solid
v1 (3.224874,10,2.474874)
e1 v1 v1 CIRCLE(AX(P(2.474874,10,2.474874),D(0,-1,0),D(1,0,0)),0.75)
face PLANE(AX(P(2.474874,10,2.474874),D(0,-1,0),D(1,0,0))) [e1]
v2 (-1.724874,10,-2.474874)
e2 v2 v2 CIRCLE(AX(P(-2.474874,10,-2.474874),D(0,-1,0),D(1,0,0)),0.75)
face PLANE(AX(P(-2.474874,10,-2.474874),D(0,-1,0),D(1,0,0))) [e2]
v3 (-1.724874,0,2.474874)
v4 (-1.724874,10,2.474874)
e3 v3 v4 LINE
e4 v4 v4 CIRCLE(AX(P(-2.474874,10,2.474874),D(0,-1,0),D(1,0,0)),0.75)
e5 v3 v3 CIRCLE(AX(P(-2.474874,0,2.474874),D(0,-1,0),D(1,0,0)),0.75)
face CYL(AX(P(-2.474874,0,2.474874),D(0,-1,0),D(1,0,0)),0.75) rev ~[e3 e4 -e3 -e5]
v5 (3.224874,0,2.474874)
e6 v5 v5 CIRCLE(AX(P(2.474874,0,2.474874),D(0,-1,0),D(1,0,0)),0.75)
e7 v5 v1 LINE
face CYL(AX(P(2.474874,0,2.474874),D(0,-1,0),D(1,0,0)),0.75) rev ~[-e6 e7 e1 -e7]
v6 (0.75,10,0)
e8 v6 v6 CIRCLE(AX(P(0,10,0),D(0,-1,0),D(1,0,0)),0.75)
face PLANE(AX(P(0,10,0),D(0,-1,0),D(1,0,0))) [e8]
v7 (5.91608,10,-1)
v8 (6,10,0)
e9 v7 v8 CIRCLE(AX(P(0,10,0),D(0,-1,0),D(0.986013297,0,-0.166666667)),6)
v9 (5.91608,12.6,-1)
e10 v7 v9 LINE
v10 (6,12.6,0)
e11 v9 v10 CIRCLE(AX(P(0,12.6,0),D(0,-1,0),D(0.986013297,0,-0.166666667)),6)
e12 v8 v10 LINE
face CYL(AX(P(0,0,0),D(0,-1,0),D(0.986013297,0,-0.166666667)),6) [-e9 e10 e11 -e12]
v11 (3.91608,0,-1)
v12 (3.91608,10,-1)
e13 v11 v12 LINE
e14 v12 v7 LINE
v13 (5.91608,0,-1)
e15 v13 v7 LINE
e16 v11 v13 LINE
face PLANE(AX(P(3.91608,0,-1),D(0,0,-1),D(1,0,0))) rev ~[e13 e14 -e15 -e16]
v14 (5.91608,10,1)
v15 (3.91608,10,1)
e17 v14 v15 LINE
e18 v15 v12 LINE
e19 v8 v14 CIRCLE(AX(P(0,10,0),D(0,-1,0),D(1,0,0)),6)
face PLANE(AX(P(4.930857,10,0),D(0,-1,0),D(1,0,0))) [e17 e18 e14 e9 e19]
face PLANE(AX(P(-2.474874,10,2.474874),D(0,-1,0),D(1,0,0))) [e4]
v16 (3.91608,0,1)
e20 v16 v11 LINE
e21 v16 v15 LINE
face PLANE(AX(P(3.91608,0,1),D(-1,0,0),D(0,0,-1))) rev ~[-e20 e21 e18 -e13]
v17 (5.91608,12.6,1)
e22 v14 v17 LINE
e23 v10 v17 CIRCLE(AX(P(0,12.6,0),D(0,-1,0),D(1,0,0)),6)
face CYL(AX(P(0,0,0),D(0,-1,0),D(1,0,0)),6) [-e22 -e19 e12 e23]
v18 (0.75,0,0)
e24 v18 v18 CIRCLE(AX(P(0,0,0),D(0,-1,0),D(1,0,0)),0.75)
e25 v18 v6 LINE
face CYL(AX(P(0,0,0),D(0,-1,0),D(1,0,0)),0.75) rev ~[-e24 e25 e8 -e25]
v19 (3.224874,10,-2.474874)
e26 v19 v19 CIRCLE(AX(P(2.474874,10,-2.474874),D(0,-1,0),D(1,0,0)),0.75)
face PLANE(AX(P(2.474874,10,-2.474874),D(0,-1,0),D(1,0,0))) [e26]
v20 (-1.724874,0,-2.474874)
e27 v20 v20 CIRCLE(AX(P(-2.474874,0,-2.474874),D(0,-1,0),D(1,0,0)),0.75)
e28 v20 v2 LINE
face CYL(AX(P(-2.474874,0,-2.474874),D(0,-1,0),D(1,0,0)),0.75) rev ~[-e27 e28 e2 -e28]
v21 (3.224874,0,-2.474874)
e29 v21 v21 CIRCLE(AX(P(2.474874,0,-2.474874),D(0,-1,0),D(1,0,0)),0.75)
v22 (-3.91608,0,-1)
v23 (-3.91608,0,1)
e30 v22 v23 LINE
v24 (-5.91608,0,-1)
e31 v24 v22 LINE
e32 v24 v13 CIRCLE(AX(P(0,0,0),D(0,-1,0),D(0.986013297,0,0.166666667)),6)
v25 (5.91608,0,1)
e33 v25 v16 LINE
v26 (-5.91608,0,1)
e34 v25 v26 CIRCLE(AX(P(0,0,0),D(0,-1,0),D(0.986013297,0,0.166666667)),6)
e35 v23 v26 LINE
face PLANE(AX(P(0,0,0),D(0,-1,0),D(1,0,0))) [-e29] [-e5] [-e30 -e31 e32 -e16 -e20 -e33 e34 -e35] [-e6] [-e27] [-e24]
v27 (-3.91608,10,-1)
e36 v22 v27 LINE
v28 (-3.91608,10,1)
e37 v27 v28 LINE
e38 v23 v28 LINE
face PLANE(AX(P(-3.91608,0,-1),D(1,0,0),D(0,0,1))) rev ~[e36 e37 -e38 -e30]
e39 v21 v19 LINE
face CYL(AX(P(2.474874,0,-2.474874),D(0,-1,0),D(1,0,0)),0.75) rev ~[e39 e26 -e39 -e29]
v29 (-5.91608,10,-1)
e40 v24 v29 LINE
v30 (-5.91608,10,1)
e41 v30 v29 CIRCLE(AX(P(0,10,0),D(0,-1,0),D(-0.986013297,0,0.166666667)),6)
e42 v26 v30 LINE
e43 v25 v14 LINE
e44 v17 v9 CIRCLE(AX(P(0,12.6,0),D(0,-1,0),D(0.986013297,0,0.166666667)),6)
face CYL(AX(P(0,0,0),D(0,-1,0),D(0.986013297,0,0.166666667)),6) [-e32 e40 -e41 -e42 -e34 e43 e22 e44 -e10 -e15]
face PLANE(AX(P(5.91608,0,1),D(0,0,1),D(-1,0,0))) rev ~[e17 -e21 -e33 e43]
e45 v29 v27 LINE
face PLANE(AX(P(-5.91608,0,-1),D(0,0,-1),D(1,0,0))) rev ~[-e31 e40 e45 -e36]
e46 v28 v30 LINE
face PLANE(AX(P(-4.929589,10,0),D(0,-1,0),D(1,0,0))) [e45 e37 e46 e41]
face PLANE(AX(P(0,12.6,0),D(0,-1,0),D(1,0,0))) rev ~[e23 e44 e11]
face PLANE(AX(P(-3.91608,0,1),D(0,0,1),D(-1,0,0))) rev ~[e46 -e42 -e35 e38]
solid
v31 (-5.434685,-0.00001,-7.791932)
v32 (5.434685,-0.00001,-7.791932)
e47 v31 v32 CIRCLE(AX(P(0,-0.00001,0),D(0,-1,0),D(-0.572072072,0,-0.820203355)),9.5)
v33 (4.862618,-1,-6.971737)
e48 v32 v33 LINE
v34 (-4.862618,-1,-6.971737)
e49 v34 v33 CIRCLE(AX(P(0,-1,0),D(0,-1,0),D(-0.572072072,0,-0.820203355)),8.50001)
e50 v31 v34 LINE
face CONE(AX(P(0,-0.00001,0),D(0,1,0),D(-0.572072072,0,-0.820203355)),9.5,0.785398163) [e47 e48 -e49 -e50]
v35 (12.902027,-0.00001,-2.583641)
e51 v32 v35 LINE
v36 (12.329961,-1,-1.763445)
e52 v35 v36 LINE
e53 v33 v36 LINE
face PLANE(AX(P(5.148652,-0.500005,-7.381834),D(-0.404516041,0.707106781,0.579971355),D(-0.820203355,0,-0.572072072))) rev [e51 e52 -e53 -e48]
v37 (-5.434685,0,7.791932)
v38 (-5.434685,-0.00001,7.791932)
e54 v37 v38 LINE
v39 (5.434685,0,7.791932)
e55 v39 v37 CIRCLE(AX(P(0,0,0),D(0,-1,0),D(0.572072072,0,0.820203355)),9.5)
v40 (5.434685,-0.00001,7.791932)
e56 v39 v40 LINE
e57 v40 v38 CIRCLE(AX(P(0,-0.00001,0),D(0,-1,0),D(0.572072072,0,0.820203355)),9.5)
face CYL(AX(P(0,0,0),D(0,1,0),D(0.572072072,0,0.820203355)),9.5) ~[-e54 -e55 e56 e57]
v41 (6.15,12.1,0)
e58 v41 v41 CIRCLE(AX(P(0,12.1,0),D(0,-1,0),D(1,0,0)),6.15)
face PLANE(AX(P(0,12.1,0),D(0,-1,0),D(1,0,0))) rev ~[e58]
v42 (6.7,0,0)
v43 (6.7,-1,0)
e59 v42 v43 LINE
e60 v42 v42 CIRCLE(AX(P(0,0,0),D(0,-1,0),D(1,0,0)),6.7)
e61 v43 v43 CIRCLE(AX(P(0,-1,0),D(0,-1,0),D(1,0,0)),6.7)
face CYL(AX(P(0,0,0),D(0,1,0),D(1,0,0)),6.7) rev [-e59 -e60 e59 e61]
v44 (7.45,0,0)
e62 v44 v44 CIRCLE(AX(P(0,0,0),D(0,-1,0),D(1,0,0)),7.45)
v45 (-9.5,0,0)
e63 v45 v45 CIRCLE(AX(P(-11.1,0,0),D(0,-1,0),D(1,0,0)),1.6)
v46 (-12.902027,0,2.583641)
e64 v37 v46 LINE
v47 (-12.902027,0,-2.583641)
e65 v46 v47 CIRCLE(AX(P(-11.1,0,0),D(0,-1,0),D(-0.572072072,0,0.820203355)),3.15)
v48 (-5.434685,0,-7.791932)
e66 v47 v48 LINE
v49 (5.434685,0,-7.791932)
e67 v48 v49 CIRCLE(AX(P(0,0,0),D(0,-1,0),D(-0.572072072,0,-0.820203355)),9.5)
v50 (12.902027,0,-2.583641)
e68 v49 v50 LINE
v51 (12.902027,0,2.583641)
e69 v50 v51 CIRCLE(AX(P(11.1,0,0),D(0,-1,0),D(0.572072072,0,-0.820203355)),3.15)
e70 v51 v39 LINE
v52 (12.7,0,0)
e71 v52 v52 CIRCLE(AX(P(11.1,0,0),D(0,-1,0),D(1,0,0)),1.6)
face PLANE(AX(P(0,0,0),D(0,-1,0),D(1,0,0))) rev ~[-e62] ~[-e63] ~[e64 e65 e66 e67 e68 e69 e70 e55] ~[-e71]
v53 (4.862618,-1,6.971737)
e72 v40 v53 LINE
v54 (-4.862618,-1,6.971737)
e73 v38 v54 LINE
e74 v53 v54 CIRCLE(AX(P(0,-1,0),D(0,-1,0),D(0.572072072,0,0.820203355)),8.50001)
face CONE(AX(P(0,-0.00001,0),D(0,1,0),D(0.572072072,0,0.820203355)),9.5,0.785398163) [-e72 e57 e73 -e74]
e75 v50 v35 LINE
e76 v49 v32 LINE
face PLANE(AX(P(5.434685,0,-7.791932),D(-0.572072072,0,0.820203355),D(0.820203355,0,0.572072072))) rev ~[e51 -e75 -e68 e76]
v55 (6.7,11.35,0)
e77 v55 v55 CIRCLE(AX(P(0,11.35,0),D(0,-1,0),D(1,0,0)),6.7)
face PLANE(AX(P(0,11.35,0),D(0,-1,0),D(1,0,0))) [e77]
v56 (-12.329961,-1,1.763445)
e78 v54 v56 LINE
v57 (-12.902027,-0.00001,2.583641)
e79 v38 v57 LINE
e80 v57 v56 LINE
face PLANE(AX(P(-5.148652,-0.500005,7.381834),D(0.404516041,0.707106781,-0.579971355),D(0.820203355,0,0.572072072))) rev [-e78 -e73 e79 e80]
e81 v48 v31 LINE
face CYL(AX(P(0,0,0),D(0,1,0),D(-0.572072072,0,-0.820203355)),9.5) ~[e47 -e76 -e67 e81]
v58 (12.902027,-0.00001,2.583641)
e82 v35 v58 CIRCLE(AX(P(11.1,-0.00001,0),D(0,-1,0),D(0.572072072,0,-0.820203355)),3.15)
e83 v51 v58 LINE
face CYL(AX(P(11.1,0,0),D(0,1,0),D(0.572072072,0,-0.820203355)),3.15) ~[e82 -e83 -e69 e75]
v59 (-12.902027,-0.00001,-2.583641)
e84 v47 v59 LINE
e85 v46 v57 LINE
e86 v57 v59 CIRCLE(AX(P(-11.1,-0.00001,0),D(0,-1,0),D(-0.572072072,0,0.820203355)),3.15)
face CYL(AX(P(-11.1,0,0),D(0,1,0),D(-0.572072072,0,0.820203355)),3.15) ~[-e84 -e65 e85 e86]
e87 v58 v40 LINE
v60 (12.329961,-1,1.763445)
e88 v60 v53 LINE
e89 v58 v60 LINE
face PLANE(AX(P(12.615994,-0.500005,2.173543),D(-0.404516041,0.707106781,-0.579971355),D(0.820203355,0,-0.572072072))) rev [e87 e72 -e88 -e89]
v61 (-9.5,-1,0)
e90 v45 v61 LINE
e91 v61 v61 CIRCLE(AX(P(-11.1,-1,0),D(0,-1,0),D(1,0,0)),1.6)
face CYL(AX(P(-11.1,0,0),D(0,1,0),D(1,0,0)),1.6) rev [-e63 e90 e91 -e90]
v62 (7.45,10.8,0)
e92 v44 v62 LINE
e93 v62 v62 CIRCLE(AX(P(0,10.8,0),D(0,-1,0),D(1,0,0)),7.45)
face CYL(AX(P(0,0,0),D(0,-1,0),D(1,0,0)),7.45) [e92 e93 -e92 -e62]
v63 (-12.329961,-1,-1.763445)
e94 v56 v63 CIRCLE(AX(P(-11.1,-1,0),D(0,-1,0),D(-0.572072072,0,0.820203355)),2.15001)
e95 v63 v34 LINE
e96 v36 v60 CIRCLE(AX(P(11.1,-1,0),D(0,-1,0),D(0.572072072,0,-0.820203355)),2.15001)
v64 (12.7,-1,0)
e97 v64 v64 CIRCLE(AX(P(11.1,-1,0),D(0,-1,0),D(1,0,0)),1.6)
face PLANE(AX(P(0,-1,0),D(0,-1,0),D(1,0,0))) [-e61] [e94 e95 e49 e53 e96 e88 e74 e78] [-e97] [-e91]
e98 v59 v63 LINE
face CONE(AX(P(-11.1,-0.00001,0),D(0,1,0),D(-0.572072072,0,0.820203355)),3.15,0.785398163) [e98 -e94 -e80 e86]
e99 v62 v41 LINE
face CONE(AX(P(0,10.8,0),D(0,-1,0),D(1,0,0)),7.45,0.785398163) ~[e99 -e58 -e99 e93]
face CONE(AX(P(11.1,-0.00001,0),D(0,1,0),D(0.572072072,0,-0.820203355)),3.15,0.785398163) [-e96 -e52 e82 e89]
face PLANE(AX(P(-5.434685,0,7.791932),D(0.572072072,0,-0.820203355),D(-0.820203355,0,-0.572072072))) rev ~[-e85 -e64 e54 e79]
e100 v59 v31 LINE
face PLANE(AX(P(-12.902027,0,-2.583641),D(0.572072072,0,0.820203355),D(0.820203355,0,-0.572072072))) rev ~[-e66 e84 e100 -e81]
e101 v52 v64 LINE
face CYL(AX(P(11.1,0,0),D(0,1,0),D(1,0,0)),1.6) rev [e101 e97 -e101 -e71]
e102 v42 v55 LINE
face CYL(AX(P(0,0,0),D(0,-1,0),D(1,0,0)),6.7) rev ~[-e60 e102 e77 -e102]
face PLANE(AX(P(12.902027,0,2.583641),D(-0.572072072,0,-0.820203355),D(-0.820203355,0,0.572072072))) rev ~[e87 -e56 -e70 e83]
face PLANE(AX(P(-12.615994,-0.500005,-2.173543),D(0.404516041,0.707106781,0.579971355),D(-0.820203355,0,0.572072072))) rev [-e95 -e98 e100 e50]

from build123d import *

# Parameters (mm, degrees)
F0_R     = 1.6
F0_R_2   = 7.45
F0_R_3   = 6.7
F1_DEPTH = 1
F2_SIZE  = 0.99999
F0_R_4   = 0.75
F3_DEPTH = 12.1
F4_T     = 0.75
F5_DEPTH = 12.6
F6_DEPTH = 10
F7_SIZE  = 1.3


# Not quite as in the source:
# - a fillet or chamfer is up to 0.001 mm smaller than in the source, because OpenCascade refuses the exact size
# - a shell that OpenCascade refuses in one call is made with other operations: the cavity is built on its own and cut out
# - a feature names something its author has since deleted; it is built from what else it names


with BuildPart() as f1:
    # F0 (on Front) → F1 (new body)
    with BuildSketch(Plane.XZ):
        with BuildLine():
            Line((-5.4346846847, 7.7919318771), (-12.902027027, 2.5836405698))
            ThreePointArc((-12.902027027, 2.5836405698), (-14.25, 0), (-12.902027027, -2.5836405698))
            Line((-12.902027027, -2.5836405698), (-5.4346846847, -7.7919318771))
            ThreePointArc((-5.4346846847, -7.7919318771), (0, -9.5), (5.4346846847, -7.7919318771))
            Line((5.4346846847, -7.7919318771), (12.902027027, -2.5836405698))
            ThreePointArc((12.902027027, -2.5836405698), (14.25, 0), (12.902027027, 2.5836405698))
            Line((12.902027027, 2.5836405698), (5.4346846847, 7.7919318771))
            ThreePointArc((5.4346846847, 7.7919318771), (0, 9.5), (-5.4346846847, 7.7919318771))
        make_face()
        with Locations((-11.1, 0)):
            Circle(F0_R, mode=Mode.SUBTRACT)
        Circle(F0_R_2, mode=Mode.SUBTRACT)
        with Locations((11.1, 0)):
            Circle(F0_R, mode=Mode.SUBTRACT)
        Circle(F0_R_2)
        Circle(F0_R_3, mode=Mode.SUBTRACT)
    extrude(amount=F1_DEPTH)

    # F2 (size 1 in the source; OpenCascade refuses exactly that, so slightly less here)
    f2_edges = [f1.edges().sort_by_distance(p)[0] for p in [
        (-9.168356, -1, 5.187786),
        (0, -1, 9.5),
        (-14.25, -1, 0),
        (-9.168356, -1, -5.187786),
        (0, -1, -9.5),
        (9.168356, -1, -5.187786),
        (14.25, -1, 0),
        (9.168356, -1, 5.187786),
    ]]
    chamfer(f2_edges, length=F2_SIZE)

    # F0 (on Front) → F3 (join)
    with BuildSketch(Plane.XZ):
        Circle(F0_R_2)
        Circle(F0_R_3, mode=Mode.SUBTRACT)
        Circle(F0_R_3)
        with BuildLine():
            ThreePointArc((5.9160797831, 1), (5.9789831367, 0.5017575617), (6, 0))
            ThreePointArc((6, 0), (5.9789831367, -0.5017575617), (5.9160797831, -1))
            ThreePointArc((5.9160797831, -1), (0, -6), (-5.9160797831, -1))
            ThreePointArc((-5.9160797831, -1), (-6, 0), (-5.9160797831, 1))
            ThreePointArc((-5.9160797831, 1), (0, 6), (5.9160797831, 1))
        make_face(mode=Mode.SUBTRACT)
        with BuildLine():
            Line((3.9160797831, 1), (5.9160797831, 1))
            ThreePointArc((5.9160797831, 1), (0, 6), (-5.9160797831, 1))
            Line((-5.9160797831, 1), (-3.9160797831, 1))
            Line((-3.9160797831, 1), (-3.9160797831, -1))
            Line((-3.9160797831, -1), (-5.9160797831, -1))
            ThreePointArc((-5.9160797831, -1), (0, -6), (5.9160797831, -1))
            Line((5.9160797831, -1), (3.9160797831, -1))
            Line((3.9160797831, -1), (3.9160797831, 1))
        make_face()
        with Locations((-2.4748737342, -2.4748737342)):
            Circle(F0_R_4, mode=Mode.SUBTRACT)
        with Locations((2.4748737342, -2.4748737342)):
            Circle(F0_R_4, mode=Mode.SUBTRACT)
        with Locations((-2.4748737342, 2.4748737342)):
            Circle(F0_R_4, mode=Mode.SUBTRACT)
        Circle(F0_R_4, mode=Mode.SUBTRACT)
        with Locations((2.4748737342, 2.4748737342)):
            Circle(F0_R_4, mode=Mode.SUBTRACT)
        with Locations((-2.4748737342, -2.4748737342)):
            Circle(F0_R_4)
        with Locations((2.4748737342, -2.4748737342)):
            Circle(F0_R_4)
        with Locations((-2.4748737342, 2.4748737342)):
            Circle(F0_R_4)
        with Locations((2.4748737342, 2.4748737342)):
            Circle(F0_R_4)
        with BuildLine():
            Line((-3.9160797831, 1), (-5.9160797831, 1))
            ThreePointArc((-5.9160797831, 1), (-6, 0), (-5.9160797831, -1))
            Line((-5.9160797831, -1), (-3.9160797831, -1))
            Line((-3.9160797831, -1), (-3.9160797831, 1))
        make_face()
        with BuildLine():
            ThreePointArc((5.9160797831, -1), (5.9789831367, -0.5017575617), (6, 0))
            ThreePointArc((6, 0), (5.9789831367, 0.5017575617), (5.9160797831, 1))
            Line((5.9160797831, 1), (3.9160797831, 1))
            Line((3.9160797831, 1), (3.9160797831, -1))
            Line((3.9160797831, -1), (5.9160797831, -1))
        make_face()
        Circle(F0_R_4)
    extrude(amount=-F3_DEPTH)

    # F4: shell of thickness 0.75, made by hand


with BuildPart() as f4_core1:
    # F4_t2: copy of F1
    add(f1.part)

    # the walls: a layer under each face that stays
    f4_faces = [f4_core1.faces().sort_by_distance(p)[0] for p in [
        (0, -5e-06, 9.5),
        (9.1683558559, -5e-06, 5.1877862235),
        (0, -0.500005, 9.000005),
        (-12.2142857143, 0, -2.7142857143),
        (-9.1683558559, -5e-06, 5.1877862235),
        (14.25, -5e-06, 0),
        (8.8823226802, -0.500005, 4.7776886467),
        (-8.83334, -1, 0),
        (-8.8823226802, -0.500005, 4.7776886467),
        (-14.25, -5e-06, 0),
        (9.1683558559, -5e-06, -5.1877862235),
        (-9.1683558559, -5e-06, -5.1877862235),
        (0, -5e-06, -9.5),
        (-12.7, -0.5, 0),
        (-7.45, 6.05, 0),
        (9.5, -0.5, 0),
        (13.750005, -0.500005, 0),
        (-13.750005, -0.500005, 0),
        (-8.8823226802, -0.500005, -4.7776886467),
        (0, -0.500005, -9.000005),
        (8.8823226802, -0.500005, -4.7776886467),
        (-6.7, -0.5, 0),
        (0, 12.1, 0),
    ]]
    thicken(f4_faces, amount=-F4_T, mode=Mode.SUBTRACT)

    # F4_s3 → F4_t4 (revolve, cut)
    with BuildSketch(Plane.XY):
        Polygon((7.4575, 0.0075), (7.45, -0.75), (6.7, -0.75), (6.7, 0), align=None)
    revolve(axis=Axis((0, 0, 0), (0, -1, 0)), mode=Mode.SUBTRACT)


with BuildPart() as f1_1:
    add(f1.part)

    # what is left inside the walls is the cavity
    f4_cavity = [f4_core1.part.solids().sort_by_distance(p)[0] for p in [
        (-6.6925, 7.566667, 0),
    ]]
    add(f4_cavity, mode=Mode.SUBTRACT)

    # F7
    f7_edges = [f1_1.edges().sort_by_distance(p)[0] for p in [
        (-7.45, 12.1, 0),
    ]]
    chamfer(f7_edges, length=F7_SIZE)


with BuildPart() as f5:
    # F0 (on Front) → F5 (new body)
    with BuildSketch(Plane.XZ):
        with BuildLine():
            Line((3.9160797831, 1), (5.9160797831, 1))
            ThreePointArc((5.9160797831, 1), (0, 6), (-5.9160797831, 1))
            Line((-5.9160797831, 1), (-3.9160797831, 1))
            Line((-3.9160797831, 1), (-3.9160797831, -1))
            Line((-3.9160797831, -1), (-5.9160797831, -1))
            ThreePointArc((-5.9160797831, -1), (0, -6), (5.9160797831, -1))
            Line((5.9160797831, -1), (3.9160797831, -1))
            Line((3.9160797831, -1), (3.9160797831, 1))
        make_face()
        with Locations((-2.4748737342, -2.4748737342)):
            Circle(F0_R_4, mode=Mode.SUBTRACT)
        with Locations((2.4748737342, -2.4748737342)):
            Circle(F0_R_4, mode=Mode.SUBTRACT)
        with Locations((-2.4748737342, 2.4748737342)):
            Circle(F0_R_4, mode=Mode.SUBTRACT)
        Circle(F0_R_4, mode=Mode.SUBTRACT)
        with Locations((2.4748737342, 2.4748737342)):
            Circle(F0_R_4, mode=Mode.SUBTRACT)
        with BuildLine():
            Line((-3.9160797831, 1), (-5.9160797831, 1))
            ThreePointArc((-5.9160797831, 1), (-6, 0), (-5.9160797831, -1))
            Line((-5.9160797831, -1), (-3.9160797831, -1))
            Line((-3.9160797831, -1), (-3.9160797831, 1))
        make_face()
        with BuildLine():
            ThreePointArc((5.9160797831, -1), (5.9789831367, -0.5017575617), (6, 0))
            ThreePointArc((6, 0), (5.9789831367, 0.5017575617), (5.9160797831, 1))
            Line((5.9160797831, 1), (3.9160797831, 1))
            Line((3.9160797831, 1), (3.9160797831, -1))
            Line((3.9160797831, -1), (5.9160797831, -1))
        make_face()
        with Locations((-2.4748737342, 2.4748737342)):
            Circle(F0_R_4)
        with Locations((2.4748737342, 2.4748737342)):
            Circle(F0_R_4)
        with Locations((-2.4748737342, -2.4748737342)):
            Circle(F0_R_4)
        with Locations((2.4748737342, -2.4748737342)):
            Circle(F0_R_4)
        Circle(F0_R_4)
    extrude(amount=-F5_DEPTH)

    # F0 (on Front) → F6 (cut)
    with BuildSketch(Plane.XZ):
        with Locations((-2.4748737342, -2.4748737342)):
            Circle(F0_R_4)
        with Locations((-2.4748737342, 2.4748737342)):
            Circle(F0_R_4)
        with Locations((2.4748737342, 2.4748737342)):
            Circle(F0_R_4)
        with Locations((2.4748737342, -2.4748737342)):
            Circle(F0_R_4)
        Circle(F0_R_4)
        with BuildLine():
            Line((-3.9160797831, 1), (-5.9160797831, 1))
            ThreePointArc((-5.9160797831, 1), (-6, 0), (-5.9160797831, -1))
            Line((-5.9160797831, -1), (-3.9160797831, -1))
            Line((-3.9160797831, -1), (-3.9160797831, 1))
        make_face()
        with BuildLine():
            ThreePointArc((5.9160797831, -1), (5.9789831367, -0.5017575617), (6, 0))
            ThreePointArc((6, 0), (5.9789831367, 0.5017575617), (5.9160797831, 1))
            Line((5.9160797831, 1), (3.9160797831, 1))
            Line((3.9160797831, 1), (3.9160797831, -1))
            Line((3.9160797831, -1), (5.9160797831, -1))
        make_face()
    extrude(amount=-F6_DEPTH, mode=Mode.SUBTRACT)


solid = Compound([f1_1.part, f5.part])
